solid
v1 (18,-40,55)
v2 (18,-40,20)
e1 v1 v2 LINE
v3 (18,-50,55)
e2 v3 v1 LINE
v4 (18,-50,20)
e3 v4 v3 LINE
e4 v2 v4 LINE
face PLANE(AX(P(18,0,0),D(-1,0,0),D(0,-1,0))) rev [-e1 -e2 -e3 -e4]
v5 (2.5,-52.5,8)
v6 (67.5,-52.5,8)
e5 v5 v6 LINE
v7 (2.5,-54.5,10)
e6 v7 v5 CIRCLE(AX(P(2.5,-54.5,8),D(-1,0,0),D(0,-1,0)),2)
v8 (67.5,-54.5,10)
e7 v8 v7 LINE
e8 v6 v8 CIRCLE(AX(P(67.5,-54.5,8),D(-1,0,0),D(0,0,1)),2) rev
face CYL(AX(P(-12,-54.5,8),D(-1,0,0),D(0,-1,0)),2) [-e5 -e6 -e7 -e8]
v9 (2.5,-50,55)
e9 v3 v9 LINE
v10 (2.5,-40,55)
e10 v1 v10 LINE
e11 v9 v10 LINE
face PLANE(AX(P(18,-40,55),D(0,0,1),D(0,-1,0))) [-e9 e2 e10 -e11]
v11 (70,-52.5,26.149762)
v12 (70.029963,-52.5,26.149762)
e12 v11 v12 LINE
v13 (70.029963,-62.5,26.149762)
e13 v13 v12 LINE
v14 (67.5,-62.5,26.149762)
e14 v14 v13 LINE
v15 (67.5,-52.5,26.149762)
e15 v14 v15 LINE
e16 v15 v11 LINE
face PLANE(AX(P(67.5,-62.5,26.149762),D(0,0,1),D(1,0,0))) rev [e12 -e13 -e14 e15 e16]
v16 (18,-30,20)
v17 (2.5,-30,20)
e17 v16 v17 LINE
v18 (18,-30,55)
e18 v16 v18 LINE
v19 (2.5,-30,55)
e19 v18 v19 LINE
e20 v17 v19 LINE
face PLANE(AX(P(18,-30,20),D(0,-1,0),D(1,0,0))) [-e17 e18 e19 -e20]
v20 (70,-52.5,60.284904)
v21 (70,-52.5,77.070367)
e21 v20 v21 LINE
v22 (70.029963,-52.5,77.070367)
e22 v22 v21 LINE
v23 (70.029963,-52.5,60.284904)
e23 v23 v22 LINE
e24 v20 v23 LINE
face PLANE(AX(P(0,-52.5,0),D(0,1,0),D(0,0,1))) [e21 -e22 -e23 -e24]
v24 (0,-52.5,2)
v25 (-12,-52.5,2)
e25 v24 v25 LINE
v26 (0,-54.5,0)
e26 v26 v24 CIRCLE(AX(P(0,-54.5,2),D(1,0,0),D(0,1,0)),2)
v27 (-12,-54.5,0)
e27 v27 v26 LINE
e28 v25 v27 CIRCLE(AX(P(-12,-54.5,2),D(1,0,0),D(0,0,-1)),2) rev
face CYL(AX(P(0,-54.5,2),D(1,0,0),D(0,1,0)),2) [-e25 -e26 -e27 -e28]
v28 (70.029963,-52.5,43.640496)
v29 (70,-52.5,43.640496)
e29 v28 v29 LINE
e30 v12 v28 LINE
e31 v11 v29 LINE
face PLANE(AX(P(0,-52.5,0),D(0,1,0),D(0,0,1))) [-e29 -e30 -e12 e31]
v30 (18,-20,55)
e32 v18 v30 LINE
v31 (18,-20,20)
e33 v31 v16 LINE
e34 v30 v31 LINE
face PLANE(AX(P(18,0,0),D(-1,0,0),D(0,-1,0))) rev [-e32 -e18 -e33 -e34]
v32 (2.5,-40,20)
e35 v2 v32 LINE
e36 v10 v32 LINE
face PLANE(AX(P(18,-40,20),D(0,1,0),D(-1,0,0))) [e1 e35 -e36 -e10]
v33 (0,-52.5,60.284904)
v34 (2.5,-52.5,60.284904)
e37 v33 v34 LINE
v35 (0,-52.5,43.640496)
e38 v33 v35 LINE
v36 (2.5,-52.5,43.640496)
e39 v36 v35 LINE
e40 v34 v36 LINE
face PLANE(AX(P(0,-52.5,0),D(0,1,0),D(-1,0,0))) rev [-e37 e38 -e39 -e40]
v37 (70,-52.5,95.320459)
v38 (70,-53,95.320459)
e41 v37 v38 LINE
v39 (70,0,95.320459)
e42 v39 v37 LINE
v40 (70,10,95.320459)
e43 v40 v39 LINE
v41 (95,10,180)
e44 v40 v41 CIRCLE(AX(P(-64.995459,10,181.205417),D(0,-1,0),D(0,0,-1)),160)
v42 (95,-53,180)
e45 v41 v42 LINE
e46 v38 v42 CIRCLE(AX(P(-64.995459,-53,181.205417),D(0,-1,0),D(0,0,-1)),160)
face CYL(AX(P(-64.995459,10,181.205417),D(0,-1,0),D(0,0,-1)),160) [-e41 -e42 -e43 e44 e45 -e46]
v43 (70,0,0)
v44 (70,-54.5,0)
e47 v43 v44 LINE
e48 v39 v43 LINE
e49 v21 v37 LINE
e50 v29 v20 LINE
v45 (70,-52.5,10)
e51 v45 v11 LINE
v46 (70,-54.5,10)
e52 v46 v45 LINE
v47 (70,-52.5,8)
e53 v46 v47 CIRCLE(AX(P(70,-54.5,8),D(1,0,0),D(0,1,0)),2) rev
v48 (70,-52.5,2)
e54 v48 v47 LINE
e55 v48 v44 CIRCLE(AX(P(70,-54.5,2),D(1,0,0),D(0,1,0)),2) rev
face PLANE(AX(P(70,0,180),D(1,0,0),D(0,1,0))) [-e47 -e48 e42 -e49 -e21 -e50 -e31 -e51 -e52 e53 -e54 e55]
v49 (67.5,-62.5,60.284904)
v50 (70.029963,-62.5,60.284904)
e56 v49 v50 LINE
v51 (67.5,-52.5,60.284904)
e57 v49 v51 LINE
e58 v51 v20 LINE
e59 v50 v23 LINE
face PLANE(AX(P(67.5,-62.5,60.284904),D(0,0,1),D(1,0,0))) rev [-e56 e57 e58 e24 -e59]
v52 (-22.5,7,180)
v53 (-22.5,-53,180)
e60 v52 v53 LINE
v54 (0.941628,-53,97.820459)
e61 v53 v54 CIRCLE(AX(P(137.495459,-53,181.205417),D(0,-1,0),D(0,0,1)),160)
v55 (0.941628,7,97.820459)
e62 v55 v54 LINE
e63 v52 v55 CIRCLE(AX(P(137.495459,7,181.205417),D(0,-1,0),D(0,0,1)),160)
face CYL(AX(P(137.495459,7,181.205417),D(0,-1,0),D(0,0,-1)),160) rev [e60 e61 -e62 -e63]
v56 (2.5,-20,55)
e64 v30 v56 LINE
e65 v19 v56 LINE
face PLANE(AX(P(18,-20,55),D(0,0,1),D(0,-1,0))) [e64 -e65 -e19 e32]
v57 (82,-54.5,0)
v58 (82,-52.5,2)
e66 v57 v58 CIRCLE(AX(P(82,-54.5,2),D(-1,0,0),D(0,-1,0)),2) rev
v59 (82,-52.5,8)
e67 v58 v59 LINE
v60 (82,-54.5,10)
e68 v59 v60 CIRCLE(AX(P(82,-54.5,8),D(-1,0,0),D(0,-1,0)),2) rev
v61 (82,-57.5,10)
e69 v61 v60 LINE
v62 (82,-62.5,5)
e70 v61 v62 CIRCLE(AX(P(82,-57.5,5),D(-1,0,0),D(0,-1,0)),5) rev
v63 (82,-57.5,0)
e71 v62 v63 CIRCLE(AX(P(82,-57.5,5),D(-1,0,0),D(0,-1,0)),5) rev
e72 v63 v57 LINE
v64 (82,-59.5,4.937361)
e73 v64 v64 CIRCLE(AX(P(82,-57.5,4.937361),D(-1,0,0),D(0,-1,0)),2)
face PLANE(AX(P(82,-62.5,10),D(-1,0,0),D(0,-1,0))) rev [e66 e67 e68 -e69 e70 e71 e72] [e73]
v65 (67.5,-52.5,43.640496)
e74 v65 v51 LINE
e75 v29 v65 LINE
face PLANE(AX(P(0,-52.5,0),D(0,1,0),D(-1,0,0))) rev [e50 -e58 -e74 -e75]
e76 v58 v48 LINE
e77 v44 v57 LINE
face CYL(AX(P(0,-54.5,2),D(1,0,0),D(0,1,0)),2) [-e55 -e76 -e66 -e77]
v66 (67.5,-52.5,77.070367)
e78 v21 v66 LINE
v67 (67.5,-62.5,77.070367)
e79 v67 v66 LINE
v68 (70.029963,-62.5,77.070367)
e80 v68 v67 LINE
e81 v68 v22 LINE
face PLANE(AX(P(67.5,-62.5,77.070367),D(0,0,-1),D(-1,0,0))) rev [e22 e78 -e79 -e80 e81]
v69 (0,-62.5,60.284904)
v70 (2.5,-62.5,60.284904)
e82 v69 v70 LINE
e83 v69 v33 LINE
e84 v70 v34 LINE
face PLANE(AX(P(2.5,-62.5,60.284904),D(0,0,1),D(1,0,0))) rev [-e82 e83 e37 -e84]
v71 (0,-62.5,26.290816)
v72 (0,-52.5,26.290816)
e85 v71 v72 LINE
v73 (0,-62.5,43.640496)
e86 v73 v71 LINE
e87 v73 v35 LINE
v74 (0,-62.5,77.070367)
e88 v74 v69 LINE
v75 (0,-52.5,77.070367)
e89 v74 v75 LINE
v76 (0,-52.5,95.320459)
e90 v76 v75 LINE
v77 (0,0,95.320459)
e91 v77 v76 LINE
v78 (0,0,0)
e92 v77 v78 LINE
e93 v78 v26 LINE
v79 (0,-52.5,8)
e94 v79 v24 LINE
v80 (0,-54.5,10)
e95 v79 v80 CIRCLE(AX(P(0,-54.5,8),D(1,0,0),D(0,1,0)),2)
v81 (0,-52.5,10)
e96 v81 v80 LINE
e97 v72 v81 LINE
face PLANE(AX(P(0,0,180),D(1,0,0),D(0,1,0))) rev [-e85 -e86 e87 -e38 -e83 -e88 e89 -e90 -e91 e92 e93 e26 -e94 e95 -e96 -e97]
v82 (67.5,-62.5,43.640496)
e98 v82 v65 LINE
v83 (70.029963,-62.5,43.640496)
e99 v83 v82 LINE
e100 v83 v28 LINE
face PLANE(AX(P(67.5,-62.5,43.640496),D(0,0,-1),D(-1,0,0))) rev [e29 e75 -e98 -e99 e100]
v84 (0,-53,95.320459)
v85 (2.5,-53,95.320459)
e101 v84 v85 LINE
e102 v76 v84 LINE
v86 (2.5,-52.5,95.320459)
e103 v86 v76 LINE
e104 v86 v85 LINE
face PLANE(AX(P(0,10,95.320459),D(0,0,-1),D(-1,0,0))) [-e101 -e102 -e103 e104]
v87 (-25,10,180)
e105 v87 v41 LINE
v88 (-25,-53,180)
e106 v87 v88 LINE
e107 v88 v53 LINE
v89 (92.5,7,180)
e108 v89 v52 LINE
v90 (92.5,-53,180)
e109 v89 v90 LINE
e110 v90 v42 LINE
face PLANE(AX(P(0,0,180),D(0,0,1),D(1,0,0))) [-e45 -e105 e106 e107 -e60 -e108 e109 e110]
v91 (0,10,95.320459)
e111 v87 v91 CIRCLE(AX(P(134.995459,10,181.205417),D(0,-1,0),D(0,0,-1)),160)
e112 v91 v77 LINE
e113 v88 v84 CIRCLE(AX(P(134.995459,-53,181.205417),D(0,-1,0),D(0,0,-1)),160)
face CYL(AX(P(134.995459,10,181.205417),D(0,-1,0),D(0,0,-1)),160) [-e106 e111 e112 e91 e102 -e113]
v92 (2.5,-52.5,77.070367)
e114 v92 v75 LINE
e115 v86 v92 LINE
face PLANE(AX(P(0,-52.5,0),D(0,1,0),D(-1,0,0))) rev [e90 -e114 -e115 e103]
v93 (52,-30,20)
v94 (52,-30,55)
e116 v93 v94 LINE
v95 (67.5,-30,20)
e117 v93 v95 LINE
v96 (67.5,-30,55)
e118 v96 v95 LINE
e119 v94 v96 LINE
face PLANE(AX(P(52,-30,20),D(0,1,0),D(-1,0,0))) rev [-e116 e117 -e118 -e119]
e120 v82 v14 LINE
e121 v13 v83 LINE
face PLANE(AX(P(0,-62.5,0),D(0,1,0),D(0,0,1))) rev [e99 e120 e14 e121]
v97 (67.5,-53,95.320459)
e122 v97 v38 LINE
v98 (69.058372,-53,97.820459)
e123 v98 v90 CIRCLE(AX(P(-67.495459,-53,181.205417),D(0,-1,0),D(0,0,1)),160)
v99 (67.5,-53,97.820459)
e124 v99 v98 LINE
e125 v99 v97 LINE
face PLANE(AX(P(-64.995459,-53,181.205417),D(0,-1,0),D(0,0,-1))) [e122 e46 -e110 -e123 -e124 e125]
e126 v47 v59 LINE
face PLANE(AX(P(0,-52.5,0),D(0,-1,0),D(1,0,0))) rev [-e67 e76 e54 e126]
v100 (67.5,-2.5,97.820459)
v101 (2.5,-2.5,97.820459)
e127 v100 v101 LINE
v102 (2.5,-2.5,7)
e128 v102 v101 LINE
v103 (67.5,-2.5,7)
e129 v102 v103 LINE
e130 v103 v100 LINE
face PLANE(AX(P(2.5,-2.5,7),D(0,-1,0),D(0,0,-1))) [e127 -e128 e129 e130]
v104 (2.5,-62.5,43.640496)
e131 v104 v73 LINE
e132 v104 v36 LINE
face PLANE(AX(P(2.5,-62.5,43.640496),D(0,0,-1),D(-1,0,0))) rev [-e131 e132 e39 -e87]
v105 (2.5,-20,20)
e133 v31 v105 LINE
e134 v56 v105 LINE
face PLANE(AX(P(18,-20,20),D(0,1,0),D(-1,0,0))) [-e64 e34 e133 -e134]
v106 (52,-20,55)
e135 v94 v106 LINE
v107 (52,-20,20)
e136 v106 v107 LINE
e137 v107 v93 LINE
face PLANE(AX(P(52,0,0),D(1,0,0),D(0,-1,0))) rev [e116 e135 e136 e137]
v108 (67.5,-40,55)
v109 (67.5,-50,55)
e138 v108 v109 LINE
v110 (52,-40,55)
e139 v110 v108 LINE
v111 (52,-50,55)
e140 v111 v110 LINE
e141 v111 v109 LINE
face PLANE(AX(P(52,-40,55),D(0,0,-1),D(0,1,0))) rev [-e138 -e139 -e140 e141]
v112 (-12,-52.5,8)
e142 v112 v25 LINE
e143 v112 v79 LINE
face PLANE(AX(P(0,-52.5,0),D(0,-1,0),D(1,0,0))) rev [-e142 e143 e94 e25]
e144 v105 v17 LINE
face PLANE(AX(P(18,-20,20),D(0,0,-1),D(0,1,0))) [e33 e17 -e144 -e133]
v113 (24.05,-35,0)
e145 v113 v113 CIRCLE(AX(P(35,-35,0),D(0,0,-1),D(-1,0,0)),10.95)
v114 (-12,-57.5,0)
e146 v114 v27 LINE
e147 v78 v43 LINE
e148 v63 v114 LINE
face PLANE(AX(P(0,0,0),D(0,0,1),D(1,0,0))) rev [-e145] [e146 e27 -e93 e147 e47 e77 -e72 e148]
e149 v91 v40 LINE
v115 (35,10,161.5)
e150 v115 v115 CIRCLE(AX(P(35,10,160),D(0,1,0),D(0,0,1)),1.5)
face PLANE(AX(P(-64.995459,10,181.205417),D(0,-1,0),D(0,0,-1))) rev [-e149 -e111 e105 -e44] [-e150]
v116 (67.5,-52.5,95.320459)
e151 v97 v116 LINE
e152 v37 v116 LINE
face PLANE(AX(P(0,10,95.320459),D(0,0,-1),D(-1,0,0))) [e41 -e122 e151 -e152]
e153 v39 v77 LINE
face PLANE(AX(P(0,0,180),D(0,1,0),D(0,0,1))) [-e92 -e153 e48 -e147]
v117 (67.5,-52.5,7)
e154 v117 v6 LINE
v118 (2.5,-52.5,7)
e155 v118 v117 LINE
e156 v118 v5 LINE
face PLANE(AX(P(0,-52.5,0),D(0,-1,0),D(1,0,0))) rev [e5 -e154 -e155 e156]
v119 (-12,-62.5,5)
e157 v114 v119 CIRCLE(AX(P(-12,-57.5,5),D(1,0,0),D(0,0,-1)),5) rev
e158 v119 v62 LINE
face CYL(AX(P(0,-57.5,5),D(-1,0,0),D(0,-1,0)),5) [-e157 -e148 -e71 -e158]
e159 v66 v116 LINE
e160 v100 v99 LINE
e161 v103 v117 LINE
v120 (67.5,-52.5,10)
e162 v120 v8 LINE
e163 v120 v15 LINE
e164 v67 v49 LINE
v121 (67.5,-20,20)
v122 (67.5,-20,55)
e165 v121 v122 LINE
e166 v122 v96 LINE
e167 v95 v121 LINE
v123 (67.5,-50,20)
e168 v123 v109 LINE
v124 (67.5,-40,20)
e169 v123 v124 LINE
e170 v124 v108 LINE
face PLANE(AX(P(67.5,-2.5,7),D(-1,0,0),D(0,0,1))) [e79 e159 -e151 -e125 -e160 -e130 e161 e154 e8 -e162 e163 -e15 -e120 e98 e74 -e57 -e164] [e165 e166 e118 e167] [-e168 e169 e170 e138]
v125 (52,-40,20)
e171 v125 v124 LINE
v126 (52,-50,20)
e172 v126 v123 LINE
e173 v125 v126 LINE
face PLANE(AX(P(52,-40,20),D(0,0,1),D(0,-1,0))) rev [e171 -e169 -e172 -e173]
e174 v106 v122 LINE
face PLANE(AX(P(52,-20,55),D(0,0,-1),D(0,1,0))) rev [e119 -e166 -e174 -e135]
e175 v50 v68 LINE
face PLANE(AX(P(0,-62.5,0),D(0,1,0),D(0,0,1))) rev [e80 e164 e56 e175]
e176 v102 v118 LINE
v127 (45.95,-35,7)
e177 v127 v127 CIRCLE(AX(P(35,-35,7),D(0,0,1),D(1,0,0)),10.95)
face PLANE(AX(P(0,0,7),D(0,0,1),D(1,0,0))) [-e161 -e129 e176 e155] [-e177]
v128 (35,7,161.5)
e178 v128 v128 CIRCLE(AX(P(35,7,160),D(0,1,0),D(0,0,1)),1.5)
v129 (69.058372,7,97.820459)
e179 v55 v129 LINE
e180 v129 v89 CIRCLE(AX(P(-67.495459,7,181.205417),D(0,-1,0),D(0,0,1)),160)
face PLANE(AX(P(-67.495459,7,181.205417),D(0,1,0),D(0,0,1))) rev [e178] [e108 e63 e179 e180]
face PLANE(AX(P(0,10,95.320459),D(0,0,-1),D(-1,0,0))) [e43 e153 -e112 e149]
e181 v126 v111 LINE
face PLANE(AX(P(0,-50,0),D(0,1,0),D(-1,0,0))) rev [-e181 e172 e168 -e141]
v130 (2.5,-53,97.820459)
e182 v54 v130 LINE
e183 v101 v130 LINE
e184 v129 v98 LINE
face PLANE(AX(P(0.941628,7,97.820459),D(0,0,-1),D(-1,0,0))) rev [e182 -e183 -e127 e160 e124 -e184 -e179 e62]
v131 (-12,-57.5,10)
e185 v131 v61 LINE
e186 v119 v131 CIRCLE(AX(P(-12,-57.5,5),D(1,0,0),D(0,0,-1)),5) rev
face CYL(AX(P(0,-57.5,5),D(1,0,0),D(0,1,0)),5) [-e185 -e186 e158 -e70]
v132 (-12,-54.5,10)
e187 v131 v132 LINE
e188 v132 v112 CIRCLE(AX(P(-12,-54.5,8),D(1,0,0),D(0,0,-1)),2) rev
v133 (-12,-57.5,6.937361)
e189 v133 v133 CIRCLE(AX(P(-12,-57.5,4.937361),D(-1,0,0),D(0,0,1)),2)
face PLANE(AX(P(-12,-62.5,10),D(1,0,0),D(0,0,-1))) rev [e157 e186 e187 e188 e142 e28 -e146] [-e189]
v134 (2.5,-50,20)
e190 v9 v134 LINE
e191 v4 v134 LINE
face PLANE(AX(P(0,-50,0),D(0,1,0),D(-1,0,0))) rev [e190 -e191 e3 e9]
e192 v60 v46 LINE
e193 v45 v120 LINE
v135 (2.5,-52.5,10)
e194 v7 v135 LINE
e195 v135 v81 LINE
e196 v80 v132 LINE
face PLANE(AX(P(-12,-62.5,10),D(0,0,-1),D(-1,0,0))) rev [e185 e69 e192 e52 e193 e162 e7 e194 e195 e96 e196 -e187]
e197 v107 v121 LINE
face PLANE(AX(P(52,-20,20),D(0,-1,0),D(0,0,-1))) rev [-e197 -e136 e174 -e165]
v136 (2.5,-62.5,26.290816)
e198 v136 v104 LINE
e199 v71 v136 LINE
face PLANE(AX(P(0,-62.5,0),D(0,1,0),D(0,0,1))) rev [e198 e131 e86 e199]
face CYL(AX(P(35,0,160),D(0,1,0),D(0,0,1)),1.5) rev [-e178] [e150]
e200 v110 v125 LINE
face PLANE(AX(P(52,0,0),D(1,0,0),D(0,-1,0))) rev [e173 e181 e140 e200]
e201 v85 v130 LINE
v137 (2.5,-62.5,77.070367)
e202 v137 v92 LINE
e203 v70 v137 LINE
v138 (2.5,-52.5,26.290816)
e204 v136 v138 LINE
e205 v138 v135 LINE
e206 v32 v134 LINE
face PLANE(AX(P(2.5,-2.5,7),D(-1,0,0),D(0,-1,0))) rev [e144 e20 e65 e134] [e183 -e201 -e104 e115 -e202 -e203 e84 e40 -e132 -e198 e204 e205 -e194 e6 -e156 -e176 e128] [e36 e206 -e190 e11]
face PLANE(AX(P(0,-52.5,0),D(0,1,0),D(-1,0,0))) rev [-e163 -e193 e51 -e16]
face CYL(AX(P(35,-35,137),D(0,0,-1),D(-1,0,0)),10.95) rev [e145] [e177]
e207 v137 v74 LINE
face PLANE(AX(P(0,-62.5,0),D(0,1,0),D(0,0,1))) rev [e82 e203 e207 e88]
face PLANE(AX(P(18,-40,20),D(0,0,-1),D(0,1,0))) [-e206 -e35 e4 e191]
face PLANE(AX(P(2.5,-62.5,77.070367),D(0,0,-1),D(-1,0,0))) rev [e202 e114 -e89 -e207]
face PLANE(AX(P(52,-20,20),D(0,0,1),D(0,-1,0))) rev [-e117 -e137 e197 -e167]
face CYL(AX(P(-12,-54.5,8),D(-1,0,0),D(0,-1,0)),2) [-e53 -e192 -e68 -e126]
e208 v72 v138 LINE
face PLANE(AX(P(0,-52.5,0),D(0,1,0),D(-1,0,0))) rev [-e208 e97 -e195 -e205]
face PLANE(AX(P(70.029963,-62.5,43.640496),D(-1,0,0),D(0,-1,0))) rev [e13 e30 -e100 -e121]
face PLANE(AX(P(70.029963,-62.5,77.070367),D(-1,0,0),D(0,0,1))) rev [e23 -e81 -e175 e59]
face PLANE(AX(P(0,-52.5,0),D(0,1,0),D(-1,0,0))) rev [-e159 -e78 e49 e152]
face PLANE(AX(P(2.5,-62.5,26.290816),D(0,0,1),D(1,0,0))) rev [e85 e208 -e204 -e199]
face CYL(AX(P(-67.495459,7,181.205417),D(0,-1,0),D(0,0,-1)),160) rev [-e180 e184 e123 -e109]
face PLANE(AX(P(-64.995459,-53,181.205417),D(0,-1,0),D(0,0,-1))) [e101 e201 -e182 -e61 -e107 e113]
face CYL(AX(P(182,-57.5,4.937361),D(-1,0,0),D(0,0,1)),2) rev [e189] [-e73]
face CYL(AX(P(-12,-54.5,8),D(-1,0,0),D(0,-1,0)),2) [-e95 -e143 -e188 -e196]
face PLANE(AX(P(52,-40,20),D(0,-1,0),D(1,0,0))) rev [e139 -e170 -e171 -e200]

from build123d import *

# Parameters (mm, degrees)
SKETCH_1_W                = 70
SKETCH_1_H                = 70
EXTRUDE_1_DEPTH           = 180
SKETCH_3_W                = 65
SKETCH_3_H                = 65
CUT_EXTRUDE_1_DEPTH       = 173
SKETCH_4_R                = 10.95
CUT_EXTRUDE_2_DEPTH       = 137
SKETCH_5_W                = 50
SKETCH_5_H                = 55
CUT_EXTRUDE_3_DEPTH       = 137
SKETCH_6_W                = 35
SKETCH_6_H                = 10
EXTRUDE_2_DEPTH           = 18
CUT_EXTRUDE_4_DEPTH       = 200.321348581
CUT_EXTRUDE_4_DEPTH_BACK  = 200.321348581
SKETCH_7_W                = 70
SKETCH_7_H                = 20
SKETCH_9_W                = 70
SKETCH_9_H                = 180
EXTRUDE_3_DEPTH           = 2.5
EXTRUDE_4_DEPTH           = 10
EXTRUDE_4_DEPTH_BACK      = 53
CUT_EXTRUDE_7_DEPTH       = 60
SKETCH_18_W               = 65
SKETCH_18_H               = 47.5
CUT_EXTRUDE_12_DEPTH      = 105
CUT_EXTRUDE_13_DEPTH      = 105
CUT_EXTRUDE_13_DEPTH_BACK = 2.5
SKETCH_20_W               = 65
SKETCH_20_H               = 125.518576077
SKETCH_21_R               = 1.5
CUT_EXTRUDE_14_DEPTH      = 10
SKETCH_23_W               = 94
SKETCH_23_H               = 10
EXTRUDE_5_DEPTH           = 10
SKETCH_24_R               = 2
CUT_EXTRUDE_15_DEPTH      = 194
FILLET_1_R                = 2
FILLET_2_R                = 2
FILLET_3_R                = 2
FILLET_4_R                = 5
SKETCH_25_W               = 2.52996266
SKETCH_25_H               = 16.78546259
SKETCH_25_H_2             = 17.490734126
SKETCH_25_W_2             = 2.5
SKETCH_25_H_3             = 17.349679819
EXTRUDE_6_DEPTH           = 10


with BuildPart() as part:
    # 스케치1 → 보스-돌출1 (new body)
    with BuildSketch(Plane.XY):
        with Locations((35, -35)):
            Rectangle(SKETCH_1_W, SKETCH_1_H)
    extrude(amount=EXTRUDE_1_DEPTH)

    # 스케치3 → 컷-돌출1 (cut)
    with BuildSketch(Plane.XY.offset(180)):
        with Locations((35, -35)):
            Rectangle(SKETCH_3_W, SKETCH_3_H)
    extrude(amount=-CUT_EXTRUDE_1_DEPTH, mode=Mode.SUBTRACT)

    # 스케치4 → 컷-돌출2 (cut)
    with BuildSketch(Plane(origin=(0, 0, 0), x_dir=(-1, 0, 0), z_dir=(0, 0, -1))):
        with Locations((-35, -35)):
            Circle(SKETCH_4_R)
    extrude(amount=-CUT_EXTRUDE_2_DEPTH, mode=Mode.SUBTRACT)

    # 스케치5 → 컷-돌출3 (cut)
    with BuildSketch(Plane(origin=(70, 0, 0), x_dir=(0, 0, -1), z_dir=(1, 0, 0))):
        with Locations((-155, -35)):
            Rectangle(SKETCH_5_W, SKETCH_5_H)
    extrude(amount=-CUT_EXTRUDE_3_DEPTH, mode=Mode.SUBTRACT)

    # 스케치6 → 보스-돌출2 (add)
    with BuildSketch(Plane.ZY):
        with Locations((37.5, -25)):
            Rectangle(SKETCH_6_W, SKETCH_6_H)
        with Locations((37.5, -45)):
            Rectangle(SKETCH_6_W, SKETCH_6_H)
    extrude_2 = extrude(amount=-EXTRUDE_2_DEPTH)

    # 대칭 복사1: 보스-돌출2 across plane
    add(extrude_2.mirror(Plane(origin=(35, 0, 0), x_dir=(0, 0, 1), z_dir=(1, 0, 0))))

    # 스케치7 → 컷-돌출4 (cut, two sides: drawn at the far end of the back side and taken through both)
    with BuildSketch(Plane.XY.offset(7).offset(-CUT_EXTRUDE_4_DEPTH_BACK)):
        with Locations((35, -60)):
            Rectangle(SKETCH_7_W, SKETCH_7_H)
    extrude(amount=CUT_EXTRUDE_4_DEPTH + CUT_EXTRUDE_4_DEPTH_BACK, mode=Mode.SUBTRACT)

    # 스케치9 → 보스-돌출3 (add)
    with BuildSketch(Plane.XZ.offset(50)):
        with Locations((35, 90)):
            Rectangle(SKETCH_9_W, SKETCH_9_H)
    extrude(amount=EXTRUDE_3_DEPTH)

    # 스케치11 → 보스-돌출4 (add, two sides: drawn at the far end of the back side and taken through both)
    with BuildSketch(Plane(origin=(0, 0, 0), x_dir=(1, 0, 0), z_dir=(0, 1, 0)).offset(-EXTRUDE_4_DEPTH_BACK)):
        with BuildLine():
            Line((0, -95.320459485), (70, -95.320459485))
            ThreePointArc((70, -95.320459485), (88.456704779, -135.901627622), (95, -180))
            Line((95, -180), (-25, -180))
            ThreePointArc((-25, -180), (-18.456704779, -135.901627622), (0, -95.320459485))
        make_face()
    extrude(amount=EXTRUDE_4_DEPTH + EXTRUDE_4_DEPTH_BACK)

    # 스케치13 → 컷-돌출7 (cut)
    with BuildSketch(Plane.XZ.offset(53)):
        with BuildLine():
            Line((-22.5, 180), (92.5, 180))
            ThreePointArc((92.5, 180), (86.367270586, 137.316234441), (69.058371922, 97.820459485))
            Line((69.058371922, 97.820459485), (0.941628078, 97.820459485))
            ThreePointArc((0.941628078, 97.820459485), (-16.367270586, 137.316234441), (-22.5, 180))
        make_face()
    extrude(amount=-CUT_EXTRUDE_7_DEPTH, mode=Mode.SUBTRACT)

    # 스케치18 → 컷-돌출12 (cut)
    with BuildSketch(Plane(origin=(0, 0, 95.320459485), x_dir=(-1, 0, 0), z_dir=(0, 0, -1))):
        with Locations((-35, -26.25)):
            Rectangle(SKETCH_18_W, SKETCH_18_H)
    extrude(amount=-CUT_EXTRUDE_12_DEPTH, mode=Mode.SUBTRACT)

    # 스케치20 → 컷-돌출13 (cut, two sides: drawn at the far end of the back side and taken through both)
    with BuildSketch(Plane.XZ.offset(52.5).offset(-CUT_EXTRUDE_13_DEPTH_BACK)):
        with Locations((35, 69.759288039)):
            Rectangle(SKETCH_20_W, SKETCH_20_H)
    extrude(amount=CUT_EXTRUDE_13_DEPTH + CUT_EXTRUDE_13_DEPTH_BACK, mode=Mode.SUBTRACT)

    # 스케치21 → 컷-돌출14 (cut)
    with BuildSketch(Plane(origin=(0, 10, 0), x_dir=(1, 0, 0), z_dir=(0, 1, 0))):
        with Locations(Location((35, -160, 0), (0, 0, 270))):
            Circle(SKETCH_21_R)
    extrude(amount=-CUT_EXTRUDE_14_DEPTH, mode=Mode.SUBTRACT)

    # 스케치23 → 보스-돌출5 (add)
    with BuildSketch(Plane.XZ.offset(52.5)):
        with Locations((35, 5)):
            Rectangle(SKETCH_23_W, SKETCH_23_H)
    extrude(amount=EXTRUDE_5_DEPTH)

    # 스케치24 → 컷-돌출15 (cut)
    with BuildSketch(Plane.ZY.offset(12)):
        with Locations((4.937361109, -57.5)):
            Circle(SKETCH_24_R)
    extrude(amount=-CUT_EXTRUDE_15_DEPTH, mode=Mode.SUBTRACT)

    # 필렛1
    fillet_1_edges = [part.edges().sort_by_distance(p)[0] for p in [
        (35, -52.5, 10),
    ]]
    fillet(fillet_1_edges, radius=FILLET_1_R)

    # 필렛2
    fillet_2_edges = [part.edges().sort_by_distance(p)[0] for p in [
        (76, -52.5, 10),
        (-6, -52.5, 10),
    ]]
    fillet(fillet_2_edges, radius=FILLET_2_R)

    # 필렛3
    fillet_3_edges = [part.edges().sort_by_distance(p)[0] for p in [
        (-6, -52.5, 0),
        (76, -52.5, 0),
    ]]
    fillet(fillet_3_edges, radius=FILLET_3_R)

    # 필렛4
    fillet_4_edges = [part.edges().sort_by_distance(p)[0] for p in [
        (35, -62.5, 10),
        (35, -62.5, 0),
    ]]
    fillet(fillet_4_edges, radius=FILLET_4_R - 0.0001)  # a hair under: the kernel refuses the full size

    # 스케치25 → 보스-돌출6 (add)
    with BuildSketch(Plane.XZ.offset(52.5)):
        with Locations((68.76498133, 68.677635779)):
            Rectangle(SKETCH_25_W, SKETCH_25_H)
        with Locations((68.76498133, 34.895129139)):
            Rectangle(SKETCH_25_W, SKETCH_25_H_2)
        with Locations((1.25, 68.677635779)):
            Rectangle(SKETCH_25_W_2, SKETCH_25_H)
        with Locations((1.25, 34.965656293)):
            Rectangle(SKETCH_25_W_2, SKETCH_25_H_3)
    extrude(amount=EXTRUDE_6_DEPTH)


solid = part.part
